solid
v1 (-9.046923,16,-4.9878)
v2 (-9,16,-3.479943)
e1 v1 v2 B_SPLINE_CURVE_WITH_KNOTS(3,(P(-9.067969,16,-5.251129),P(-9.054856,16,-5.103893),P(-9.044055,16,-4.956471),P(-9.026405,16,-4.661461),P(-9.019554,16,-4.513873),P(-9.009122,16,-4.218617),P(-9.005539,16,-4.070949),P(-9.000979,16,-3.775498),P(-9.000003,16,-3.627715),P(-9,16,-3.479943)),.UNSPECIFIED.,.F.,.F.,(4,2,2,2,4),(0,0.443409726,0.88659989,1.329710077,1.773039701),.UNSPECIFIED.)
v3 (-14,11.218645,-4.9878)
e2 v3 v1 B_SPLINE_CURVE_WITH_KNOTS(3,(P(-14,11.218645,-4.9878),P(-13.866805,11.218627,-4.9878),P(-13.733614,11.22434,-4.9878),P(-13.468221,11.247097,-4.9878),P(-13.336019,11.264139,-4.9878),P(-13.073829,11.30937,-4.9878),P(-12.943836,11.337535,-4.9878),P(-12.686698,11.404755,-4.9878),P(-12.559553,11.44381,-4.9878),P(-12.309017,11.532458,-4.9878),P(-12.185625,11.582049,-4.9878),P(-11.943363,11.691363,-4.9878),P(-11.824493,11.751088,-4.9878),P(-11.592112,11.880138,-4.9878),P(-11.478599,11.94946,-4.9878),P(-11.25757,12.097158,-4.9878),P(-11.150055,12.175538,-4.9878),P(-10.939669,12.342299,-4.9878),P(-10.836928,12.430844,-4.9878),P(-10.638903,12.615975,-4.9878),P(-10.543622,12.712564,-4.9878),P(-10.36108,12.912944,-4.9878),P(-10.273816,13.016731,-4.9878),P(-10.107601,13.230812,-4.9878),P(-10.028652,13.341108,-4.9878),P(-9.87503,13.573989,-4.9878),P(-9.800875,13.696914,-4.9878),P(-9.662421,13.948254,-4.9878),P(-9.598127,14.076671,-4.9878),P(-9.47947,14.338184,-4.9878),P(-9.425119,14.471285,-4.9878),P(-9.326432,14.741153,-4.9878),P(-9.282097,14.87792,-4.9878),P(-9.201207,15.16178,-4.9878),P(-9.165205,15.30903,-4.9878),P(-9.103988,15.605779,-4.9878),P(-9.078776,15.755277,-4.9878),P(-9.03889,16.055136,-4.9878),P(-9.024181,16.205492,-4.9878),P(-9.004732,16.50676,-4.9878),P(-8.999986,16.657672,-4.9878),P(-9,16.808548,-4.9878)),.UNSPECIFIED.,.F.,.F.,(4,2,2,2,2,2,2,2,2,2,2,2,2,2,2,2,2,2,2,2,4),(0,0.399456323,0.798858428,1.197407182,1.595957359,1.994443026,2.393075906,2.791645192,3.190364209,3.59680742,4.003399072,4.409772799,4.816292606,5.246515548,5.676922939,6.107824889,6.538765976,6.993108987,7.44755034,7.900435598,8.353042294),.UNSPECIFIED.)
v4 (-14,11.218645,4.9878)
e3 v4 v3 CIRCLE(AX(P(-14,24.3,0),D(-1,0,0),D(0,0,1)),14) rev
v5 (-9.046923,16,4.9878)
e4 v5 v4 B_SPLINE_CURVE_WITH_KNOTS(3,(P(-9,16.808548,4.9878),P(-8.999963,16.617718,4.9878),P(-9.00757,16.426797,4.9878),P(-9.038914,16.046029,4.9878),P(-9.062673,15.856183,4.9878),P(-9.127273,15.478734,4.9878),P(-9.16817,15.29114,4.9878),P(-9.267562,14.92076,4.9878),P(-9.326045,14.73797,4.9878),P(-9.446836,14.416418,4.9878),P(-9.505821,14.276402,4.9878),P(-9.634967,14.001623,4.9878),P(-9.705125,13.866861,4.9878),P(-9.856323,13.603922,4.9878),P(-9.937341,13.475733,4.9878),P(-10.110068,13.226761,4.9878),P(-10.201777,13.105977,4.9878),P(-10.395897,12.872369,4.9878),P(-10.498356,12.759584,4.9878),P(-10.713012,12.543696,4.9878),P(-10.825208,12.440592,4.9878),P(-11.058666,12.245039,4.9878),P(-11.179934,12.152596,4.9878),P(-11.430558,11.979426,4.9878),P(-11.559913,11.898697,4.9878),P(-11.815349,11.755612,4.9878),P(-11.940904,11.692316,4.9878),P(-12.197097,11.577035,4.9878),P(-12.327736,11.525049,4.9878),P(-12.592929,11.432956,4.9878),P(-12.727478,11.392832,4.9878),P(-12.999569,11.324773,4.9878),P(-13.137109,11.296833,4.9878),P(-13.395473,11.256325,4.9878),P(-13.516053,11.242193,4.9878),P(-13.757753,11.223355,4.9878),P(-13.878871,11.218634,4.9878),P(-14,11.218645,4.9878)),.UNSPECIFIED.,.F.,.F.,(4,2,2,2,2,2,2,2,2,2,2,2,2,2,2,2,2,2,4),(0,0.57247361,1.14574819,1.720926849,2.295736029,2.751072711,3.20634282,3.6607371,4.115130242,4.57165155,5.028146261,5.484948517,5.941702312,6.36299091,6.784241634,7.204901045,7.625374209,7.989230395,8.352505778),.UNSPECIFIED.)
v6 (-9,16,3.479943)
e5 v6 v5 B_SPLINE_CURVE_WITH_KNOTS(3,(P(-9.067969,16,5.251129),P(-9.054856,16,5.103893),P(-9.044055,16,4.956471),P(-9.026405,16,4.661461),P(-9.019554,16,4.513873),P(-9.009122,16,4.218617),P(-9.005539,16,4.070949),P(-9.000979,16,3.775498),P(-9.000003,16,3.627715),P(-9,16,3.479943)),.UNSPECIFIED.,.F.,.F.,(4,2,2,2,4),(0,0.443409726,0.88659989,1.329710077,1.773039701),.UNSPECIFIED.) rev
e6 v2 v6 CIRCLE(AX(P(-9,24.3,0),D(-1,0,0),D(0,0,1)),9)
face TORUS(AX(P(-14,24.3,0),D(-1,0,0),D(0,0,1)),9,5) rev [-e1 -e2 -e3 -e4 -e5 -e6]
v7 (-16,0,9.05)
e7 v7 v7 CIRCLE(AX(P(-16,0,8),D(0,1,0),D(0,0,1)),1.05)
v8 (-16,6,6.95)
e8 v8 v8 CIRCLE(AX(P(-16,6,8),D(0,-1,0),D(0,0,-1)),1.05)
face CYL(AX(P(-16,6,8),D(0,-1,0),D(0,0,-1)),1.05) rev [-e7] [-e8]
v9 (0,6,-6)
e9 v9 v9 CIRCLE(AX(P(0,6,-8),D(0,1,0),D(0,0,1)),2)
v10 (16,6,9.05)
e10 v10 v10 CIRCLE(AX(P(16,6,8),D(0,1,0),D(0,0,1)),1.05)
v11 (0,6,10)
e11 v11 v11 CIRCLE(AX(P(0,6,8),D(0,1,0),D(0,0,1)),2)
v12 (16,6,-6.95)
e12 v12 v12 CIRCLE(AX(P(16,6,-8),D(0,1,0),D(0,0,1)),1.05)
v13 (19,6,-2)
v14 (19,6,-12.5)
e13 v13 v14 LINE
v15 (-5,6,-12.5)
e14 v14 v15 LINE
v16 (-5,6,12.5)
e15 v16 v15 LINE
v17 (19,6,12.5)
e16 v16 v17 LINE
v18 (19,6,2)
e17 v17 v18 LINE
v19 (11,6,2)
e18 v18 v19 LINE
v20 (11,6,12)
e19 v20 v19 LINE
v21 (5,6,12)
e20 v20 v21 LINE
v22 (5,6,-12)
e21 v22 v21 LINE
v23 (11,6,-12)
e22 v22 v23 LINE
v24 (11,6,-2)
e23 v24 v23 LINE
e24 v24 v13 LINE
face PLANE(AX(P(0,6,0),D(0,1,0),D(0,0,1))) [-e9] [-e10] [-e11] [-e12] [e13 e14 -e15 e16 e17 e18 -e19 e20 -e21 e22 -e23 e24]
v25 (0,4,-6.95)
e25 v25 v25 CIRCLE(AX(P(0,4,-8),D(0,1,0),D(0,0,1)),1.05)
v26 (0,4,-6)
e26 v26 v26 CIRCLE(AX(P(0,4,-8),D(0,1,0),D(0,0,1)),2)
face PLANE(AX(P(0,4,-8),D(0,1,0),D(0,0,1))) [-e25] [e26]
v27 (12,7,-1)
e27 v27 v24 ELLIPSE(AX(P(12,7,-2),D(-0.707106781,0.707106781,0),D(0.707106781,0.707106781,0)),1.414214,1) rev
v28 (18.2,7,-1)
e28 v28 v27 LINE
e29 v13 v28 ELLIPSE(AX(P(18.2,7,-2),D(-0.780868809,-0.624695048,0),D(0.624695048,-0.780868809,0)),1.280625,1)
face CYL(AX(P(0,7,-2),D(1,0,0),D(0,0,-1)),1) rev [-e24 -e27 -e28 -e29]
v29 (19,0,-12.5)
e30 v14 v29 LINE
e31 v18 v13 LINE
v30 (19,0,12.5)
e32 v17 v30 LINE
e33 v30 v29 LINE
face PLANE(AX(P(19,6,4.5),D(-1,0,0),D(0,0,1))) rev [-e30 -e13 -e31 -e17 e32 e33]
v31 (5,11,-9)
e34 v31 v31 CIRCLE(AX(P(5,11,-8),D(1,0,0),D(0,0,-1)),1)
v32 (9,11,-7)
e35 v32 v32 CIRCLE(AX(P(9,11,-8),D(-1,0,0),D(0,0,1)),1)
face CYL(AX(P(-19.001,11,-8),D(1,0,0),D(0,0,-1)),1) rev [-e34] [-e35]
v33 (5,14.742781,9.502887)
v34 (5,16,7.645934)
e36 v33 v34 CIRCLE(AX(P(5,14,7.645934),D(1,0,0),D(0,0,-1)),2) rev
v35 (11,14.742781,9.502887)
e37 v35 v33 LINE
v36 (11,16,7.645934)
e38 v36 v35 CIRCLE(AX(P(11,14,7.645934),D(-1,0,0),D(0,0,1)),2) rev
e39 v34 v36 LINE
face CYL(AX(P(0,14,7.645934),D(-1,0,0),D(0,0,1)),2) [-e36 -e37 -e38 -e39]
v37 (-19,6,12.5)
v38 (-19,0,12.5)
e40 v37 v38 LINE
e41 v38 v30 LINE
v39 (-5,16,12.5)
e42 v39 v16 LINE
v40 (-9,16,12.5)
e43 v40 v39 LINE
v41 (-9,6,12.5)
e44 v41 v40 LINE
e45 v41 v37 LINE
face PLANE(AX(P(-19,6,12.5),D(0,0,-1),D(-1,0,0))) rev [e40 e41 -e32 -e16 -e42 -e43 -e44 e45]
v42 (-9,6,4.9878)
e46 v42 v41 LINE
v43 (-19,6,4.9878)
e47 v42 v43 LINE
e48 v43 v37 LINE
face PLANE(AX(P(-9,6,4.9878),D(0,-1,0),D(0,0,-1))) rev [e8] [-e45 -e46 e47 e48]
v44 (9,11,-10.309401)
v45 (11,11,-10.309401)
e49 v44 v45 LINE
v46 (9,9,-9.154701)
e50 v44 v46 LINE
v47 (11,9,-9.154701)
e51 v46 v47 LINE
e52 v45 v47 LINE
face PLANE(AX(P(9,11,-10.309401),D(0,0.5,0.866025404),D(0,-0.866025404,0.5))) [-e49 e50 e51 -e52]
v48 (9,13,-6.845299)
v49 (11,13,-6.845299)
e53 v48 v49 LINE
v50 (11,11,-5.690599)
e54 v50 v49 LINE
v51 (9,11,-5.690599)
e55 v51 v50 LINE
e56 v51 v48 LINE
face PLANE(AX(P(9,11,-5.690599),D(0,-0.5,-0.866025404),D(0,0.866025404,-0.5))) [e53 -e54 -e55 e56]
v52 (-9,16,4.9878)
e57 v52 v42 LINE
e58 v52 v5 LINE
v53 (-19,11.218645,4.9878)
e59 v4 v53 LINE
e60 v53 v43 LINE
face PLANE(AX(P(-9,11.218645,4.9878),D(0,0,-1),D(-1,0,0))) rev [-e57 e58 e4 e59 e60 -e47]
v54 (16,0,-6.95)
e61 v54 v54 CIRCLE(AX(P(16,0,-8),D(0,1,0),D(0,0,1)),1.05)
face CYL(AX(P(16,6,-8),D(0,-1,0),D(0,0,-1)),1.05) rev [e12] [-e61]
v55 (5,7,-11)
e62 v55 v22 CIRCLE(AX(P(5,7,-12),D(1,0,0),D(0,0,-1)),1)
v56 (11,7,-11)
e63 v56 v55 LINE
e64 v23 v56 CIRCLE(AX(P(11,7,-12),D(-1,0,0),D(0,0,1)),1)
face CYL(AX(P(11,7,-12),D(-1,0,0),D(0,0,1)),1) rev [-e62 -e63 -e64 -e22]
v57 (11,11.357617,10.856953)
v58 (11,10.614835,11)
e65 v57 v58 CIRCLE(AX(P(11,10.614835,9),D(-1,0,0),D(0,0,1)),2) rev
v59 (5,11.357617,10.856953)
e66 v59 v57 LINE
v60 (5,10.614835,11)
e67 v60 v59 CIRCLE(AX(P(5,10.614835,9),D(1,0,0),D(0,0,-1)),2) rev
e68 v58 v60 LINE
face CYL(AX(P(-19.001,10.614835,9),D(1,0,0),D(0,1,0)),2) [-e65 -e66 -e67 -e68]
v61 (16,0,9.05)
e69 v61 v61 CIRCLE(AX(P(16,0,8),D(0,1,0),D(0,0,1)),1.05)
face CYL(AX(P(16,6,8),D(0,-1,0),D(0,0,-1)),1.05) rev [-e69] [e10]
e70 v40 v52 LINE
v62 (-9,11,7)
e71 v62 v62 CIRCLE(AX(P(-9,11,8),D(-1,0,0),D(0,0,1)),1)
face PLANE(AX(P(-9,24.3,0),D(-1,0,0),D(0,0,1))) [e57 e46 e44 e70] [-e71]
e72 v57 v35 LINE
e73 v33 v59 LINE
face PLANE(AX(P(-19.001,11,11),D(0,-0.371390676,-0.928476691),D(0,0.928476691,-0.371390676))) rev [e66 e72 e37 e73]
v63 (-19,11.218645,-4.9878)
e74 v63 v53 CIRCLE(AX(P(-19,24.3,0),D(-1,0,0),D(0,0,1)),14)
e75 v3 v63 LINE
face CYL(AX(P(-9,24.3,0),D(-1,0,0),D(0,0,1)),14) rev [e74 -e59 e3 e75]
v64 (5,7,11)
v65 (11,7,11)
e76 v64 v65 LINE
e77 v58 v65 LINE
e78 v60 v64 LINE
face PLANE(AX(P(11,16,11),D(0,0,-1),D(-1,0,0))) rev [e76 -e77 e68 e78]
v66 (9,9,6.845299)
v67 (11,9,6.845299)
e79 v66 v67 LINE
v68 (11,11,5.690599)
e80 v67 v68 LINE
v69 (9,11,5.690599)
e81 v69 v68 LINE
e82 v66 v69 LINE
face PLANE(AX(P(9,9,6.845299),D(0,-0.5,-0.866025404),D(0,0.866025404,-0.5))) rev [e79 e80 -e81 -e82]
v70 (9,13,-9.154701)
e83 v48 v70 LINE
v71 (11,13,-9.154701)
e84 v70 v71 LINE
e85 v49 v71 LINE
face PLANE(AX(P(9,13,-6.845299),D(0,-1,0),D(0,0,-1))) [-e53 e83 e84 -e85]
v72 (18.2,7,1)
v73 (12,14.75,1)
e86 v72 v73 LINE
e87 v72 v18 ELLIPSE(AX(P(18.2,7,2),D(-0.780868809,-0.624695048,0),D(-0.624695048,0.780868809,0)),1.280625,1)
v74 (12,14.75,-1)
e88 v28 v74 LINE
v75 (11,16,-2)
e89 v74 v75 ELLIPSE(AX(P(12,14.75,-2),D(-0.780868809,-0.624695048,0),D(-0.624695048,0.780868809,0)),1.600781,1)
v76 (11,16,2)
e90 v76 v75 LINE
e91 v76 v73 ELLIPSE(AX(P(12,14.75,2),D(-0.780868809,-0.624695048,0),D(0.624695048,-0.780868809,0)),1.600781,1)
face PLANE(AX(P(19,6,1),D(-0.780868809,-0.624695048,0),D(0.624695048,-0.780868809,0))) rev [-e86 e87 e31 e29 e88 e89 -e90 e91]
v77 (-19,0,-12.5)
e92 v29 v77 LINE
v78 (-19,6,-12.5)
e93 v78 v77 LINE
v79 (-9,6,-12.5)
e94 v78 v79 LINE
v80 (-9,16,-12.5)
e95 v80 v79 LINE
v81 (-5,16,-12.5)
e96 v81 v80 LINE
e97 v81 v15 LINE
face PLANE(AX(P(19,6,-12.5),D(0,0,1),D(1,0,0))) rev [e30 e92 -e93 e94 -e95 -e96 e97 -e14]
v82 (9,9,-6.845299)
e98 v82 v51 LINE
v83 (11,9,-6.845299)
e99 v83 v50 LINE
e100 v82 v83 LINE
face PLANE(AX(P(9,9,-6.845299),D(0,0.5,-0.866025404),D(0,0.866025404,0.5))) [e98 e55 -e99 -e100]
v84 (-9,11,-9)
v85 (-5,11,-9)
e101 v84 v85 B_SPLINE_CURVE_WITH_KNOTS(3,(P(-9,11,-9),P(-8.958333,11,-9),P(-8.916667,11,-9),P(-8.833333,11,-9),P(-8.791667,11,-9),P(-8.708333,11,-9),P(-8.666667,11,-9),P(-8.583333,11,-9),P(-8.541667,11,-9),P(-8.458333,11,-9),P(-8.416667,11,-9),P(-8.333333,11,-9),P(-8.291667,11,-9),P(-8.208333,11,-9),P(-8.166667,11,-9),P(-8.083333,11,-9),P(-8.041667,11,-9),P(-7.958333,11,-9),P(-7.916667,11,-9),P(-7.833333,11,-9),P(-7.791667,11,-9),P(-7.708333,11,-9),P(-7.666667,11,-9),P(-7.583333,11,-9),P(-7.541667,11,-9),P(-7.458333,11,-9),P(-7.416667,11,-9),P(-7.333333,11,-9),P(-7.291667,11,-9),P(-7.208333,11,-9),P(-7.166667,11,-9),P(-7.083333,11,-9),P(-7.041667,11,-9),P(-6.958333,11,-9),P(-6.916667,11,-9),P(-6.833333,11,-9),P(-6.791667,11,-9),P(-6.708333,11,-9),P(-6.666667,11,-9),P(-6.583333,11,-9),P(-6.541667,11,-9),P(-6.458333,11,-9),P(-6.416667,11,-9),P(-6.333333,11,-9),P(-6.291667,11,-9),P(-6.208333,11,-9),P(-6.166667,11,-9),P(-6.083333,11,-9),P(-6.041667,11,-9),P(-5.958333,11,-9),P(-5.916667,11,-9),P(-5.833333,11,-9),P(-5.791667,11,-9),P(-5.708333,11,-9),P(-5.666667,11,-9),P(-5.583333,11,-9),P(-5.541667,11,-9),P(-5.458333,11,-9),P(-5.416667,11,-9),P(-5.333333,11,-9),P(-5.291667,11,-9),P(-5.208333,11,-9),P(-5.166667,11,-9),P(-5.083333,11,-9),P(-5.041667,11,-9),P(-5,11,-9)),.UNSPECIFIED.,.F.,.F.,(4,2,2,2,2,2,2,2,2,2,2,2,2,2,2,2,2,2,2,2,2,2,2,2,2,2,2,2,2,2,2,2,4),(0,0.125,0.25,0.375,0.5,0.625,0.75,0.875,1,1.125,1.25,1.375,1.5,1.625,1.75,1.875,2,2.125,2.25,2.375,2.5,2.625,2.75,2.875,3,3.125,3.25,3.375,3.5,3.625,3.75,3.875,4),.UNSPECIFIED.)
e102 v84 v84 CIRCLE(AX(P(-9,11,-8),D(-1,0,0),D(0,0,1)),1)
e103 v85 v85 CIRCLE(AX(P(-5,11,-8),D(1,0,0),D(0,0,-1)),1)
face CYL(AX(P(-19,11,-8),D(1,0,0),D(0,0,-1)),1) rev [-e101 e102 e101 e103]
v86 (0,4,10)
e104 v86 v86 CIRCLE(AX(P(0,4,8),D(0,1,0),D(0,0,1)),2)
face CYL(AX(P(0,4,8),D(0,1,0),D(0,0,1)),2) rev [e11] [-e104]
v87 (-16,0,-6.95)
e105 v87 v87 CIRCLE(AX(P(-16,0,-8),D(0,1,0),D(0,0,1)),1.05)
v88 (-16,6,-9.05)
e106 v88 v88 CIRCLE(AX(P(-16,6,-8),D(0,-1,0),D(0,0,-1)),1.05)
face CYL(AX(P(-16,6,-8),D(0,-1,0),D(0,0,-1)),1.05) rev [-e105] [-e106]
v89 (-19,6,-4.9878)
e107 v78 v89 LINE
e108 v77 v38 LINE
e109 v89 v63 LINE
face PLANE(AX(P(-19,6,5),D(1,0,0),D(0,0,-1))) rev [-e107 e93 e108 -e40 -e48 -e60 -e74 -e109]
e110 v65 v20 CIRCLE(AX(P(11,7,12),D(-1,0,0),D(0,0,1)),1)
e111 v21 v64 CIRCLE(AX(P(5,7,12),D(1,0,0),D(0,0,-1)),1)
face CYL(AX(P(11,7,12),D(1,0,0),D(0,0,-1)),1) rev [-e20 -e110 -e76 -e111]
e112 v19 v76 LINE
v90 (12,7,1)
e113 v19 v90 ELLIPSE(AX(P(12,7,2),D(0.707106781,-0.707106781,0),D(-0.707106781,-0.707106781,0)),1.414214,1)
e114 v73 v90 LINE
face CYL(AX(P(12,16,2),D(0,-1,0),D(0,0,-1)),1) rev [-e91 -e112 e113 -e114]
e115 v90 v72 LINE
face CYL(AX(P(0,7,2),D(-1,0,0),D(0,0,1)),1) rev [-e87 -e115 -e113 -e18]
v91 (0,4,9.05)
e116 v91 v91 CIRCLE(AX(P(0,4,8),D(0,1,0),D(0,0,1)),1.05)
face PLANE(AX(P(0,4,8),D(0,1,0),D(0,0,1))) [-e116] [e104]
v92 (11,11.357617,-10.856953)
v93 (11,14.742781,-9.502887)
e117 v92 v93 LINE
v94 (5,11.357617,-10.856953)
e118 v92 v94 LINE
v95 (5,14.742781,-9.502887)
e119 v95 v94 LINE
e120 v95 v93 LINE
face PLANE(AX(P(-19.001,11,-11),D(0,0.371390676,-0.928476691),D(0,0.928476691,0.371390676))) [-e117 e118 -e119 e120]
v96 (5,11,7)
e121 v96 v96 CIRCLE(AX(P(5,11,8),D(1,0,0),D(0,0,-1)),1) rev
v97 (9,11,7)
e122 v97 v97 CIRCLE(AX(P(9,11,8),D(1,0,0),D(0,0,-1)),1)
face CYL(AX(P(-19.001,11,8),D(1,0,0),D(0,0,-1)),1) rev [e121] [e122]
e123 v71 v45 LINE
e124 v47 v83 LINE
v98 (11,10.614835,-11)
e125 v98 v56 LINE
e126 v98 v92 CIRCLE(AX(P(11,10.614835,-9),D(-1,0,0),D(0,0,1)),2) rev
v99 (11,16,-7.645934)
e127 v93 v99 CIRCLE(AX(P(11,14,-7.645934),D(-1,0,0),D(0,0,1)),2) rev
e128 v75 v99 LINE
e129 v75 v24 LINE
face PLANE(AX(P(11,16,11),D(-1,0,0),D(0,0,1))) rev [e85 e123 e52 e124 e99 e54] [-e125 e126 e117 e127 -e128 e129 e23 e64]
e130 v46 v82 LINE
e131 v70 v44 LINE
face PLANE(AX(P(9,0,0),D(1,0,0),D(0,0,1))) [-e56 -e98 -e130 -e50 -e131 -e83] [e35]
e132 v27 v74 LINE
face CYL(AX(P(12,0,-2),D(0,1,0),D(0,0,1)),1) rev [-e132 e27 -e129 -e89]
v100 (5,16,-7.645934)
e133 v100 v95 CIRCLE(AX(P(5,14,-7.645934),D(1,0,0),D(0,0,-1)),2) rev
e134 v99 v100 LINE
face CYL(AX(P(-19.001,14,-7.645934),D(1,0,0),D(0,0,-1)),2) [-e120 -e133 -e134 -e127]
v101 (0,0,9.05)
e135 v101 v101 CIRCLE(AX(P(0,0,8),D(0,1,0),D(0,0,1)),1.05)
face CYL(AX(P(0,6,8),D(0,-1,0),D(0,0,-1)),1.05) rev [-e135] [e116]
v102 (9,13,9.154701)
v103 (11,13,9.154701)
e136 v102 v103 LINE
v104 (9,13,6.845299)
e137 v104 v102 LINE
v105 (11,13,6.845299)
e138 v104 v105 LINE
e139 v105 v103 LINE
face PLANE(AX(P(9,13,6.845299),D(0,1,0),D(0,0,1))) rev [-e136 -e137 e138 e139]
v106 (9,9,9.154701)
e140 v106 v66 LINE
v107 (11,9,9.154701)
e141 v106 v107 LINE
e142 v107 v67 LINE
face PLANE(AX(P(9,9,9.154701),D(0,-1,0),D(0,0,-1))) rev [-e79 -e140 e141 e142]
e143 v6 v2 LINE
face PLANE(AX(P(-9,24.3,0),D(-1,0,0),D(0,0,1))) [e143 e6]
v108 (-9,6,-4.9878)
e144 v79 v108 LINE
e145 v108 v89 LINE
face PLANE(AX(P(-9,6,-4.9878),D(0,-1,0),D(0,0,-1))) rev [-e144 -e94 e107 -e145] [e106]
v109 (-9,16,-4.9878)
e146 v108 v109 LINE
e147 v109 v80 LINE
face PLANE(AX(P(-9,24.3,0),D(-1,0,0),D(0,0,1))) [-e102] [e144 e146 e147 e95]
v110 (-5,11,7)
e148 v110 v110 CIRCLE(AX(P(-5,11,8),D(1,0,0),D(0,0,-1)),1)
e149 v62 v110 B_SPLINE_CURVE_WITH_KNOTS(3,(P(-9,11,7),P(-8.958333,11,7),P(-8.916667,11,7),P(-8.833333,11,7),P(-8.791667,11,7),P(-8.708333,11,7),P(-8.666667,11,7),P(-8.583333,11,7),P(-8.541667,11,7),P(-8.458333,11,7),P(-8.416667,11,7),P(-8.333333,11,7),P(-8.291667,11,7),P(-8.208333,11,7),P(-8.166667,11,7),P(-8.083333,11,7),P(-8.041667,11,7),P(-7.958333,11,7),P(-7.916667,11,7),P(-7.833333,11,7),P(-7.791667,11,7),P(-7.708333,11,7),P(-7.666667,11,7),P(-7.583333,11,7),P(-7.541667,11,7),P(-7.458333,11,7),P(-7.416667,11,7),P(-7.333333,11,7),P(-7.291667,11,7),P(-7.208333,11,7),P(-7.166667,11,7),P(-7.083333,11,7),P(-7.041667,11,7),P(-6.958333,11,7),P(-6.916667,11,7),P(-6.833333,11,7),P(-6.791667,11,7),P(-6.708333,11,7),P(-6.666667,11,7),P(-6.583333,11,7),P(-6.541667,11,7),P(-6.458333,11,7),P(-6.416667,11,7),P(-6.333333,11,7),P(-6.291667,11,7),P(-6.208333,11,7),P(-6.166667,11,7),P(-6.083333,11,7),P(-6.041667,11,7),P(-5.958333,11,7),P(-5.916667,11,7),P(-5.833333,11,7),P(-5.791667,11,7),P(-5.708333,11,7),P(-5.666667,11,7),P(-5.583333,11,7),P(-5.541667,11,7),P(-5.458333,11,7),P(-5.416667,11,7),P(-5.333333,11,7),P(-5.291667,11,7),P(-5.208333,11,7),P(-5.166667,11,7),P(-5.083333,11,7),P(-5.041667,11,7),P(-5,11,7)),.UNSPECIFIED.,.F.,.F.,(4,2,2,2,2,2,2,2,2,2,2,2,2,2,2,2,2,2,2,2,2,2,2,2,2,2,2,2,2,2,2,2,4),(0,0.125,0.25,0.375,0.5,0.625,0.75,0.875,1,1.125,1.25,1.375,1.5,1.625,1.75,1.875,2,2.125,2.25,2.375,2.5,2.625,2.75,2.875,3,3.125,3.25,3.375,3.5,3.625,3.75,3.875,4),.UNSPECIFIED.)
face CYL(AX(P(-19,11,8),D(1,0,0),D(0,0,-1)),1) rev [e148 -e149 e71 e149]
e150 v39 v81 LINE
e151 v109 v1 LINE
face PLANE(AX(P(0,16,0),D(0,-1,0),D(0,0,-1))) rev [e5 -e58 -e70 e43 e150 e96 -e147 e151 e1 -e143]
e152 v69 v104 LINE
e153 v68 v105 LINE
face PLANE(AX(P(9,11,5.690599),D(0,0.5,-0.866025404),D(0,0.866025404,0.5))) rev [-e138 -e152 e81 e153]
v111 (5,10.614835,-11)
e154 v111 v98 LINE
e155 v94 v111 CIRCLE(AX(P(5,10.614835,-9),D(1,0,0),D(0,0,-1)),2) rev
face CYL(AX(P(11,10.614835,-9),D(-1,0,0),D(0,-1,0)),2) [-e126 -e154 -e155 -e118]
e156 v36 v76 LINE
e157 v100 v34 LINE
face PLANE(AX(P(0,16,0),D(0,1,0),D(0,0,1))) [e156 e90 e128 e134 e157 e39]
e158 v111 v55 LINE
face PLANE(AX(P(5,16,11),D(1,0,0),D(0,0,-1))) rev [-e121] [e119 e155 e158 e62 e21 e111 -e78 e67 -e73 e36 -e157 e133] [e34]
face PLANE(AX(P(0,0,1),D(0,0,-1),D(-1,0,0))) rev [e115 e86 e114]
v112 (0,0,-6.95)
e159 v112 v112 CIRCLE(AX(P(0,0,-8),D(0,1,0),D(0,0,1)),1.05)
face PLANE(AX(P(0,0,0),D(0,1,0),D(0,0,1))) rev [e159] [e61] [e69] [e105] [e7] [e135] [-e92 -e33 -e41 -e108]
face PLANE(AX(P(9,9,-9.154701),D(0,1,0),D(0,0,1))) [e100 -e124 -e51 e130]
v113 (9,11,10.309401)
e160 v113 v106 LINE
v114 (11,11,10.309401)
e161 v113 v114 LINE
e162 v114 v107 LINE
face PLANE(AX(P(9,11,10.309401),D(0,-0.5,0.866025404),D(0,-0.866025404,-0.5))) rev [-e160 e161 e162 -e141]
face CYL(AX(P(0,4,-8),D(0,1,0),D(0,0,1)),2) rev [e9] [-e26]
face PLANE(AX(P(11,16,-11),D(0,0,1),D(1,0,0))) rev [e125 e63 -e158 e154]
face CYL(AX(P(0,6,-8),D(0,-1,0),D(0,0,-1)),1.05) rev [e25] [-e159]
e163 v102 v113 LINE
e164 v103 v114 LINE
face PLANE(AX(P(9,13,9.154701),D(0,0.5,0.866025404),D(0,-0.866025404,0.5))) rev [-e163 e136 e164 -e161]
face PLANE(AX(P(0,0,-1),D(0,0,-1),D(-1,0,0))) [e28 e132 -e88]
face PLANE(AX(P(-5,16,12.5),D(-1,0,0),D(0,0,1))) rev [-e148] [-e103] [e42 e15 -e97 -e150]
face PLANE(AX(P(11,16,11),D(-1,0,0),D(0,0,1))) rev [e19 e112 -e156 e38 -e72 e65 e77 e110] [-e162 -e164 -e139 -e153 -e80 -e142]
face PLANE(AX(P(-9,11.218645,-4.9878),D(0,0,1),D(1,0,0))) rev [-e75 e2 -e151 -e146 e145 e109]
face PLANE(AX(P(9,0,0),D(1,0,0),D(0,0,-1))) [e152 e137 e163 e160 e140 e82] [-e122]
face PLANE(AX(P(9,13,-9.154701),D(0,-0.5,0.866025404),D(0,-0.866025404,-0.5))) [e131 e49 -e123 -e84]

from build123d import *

# Parameters (mm, degrees)
SKETCH1_R           = 1.05
BOSS_EXTRUDE1_DEPTH = 6
SKETCH2_W           = 14
SKETCH2_H           = 25
SKETCH2_W_2         = 6
SKETCH2_H_2         = 22
BOSS_EXTRUDE2_DEPTH = 10
FILLET1_R           = 1
CUT_EXTRUDE2_START  = -6
CUT_EXTRUDE2_DEPTH  = 6
FILLET2_R           = 2
CUT_EXTRUDE3_DEPTH  = 2
CUT_EXTRUDE4_REACH  = 36.587
SKETCH9_R           = 1
BOSS_EXTRUDE3_DEPTH = 1
FILLET3_R           = 1
SKETCH13_R          = 2
CUT_EXTRUDE5_DEPTH  = 2
CUT_EXTRUDE6_DEPTH  = 10
SKETCH15_R          = 1
CUT_EXTRUDE7_DEPTH  = 32.436443819
FILLET4_R           = 5


with BuildPart() as part:
    # Sketch1 → Boss-Extrude1 (new body)
    with BuildSketch(Plane(origin=(0, 0, 0), x_dir=(1, 0, 0), z_dir=(0, 1, 0))):
        Polygon((19, -4.5), (19, 5), (19, 12.5), (-19, 12.5), (-19, 5), (-19, -4.5), (-19, -5), (-19, -12.5), (19, -12.5), (19, -5), align=None)
        with Locations(Location((16, -8, 0), (0, 0, 270))):
            Circle(SKETCH1_R, mode=Mode.SUBTRACT)
        with Locations(Location((0, -8, 0), (0, 0, 270))):
            Circle(SKETCH1_R, mode=Mode.SUBTRACT)
        with Locations(Location((16, 8, 0), (0, 0, 270))):
            Circle(SKETCH1_R, mode=Mode.SUBTRACT)
        with Locations(Location((0, 8, 0), (0, 0, 270))):
            Circle(SKETCH1_R, mode=Mode.SUBTRACT)
        with Locations(Location((-16, -8, 0), (0, 0, 270))):
            Circle(SKETCH1_R, mode=Mode.SUBTRACT)
        with Locations(Location((-16, 8, 0), (0, 0, 270))):
            Circle(SKETCH1_R, mode=Mode.SUBTRACT)
    extrude(amount=BOSS_EXTRUDE1_DEPTH)

    # Sketch2 → Boss-Extrude2 (add)
    with BuildSketch(Plane(origin=(0, 6, 0), x_dir=(1, 0, 0), z_dir=(0, 1, 0))):
        with Locations((-12, 0)):
            Rectangle(SKETCH2_W, SKETCH2_H)
        with Locations((8, 0)):
            Rectangle(SKETCH2_W_2, SKETCH2_H_2)
    extrude(amount=BOSS_EXTRUDE2_DEPTH)

    # Fillet1
    fillet1_edges = [part.edges().sort_by_distance(p)[0] for p in [
        (8, 6, -11),
        (8, 6, 11),
    ]]
    fillet(fillet1_edges, radius=FILLET1_R)

    # Sketch7 → Cut-Extrude2 (cut)
    with BuildSketch(Plane(origin=(11, 0, 0), x_dir=(0, 0, -1), z_dir=(1, 0, 0)).offset(CUT_EXTRUDE2_START)):
        Polygon((-11, 11), (-9, 16), (9, 16), (11, 11), (15.487403983, 11), (15.487403983, 19.998448993), (-12.222391387, 19.998448993), (-12.222391387, 11), align=None)
    extrude(amount=CUT_EXTRUDE2_DEPTH, mode=Mode.SUBTRACT)

    # Fillet2
    fillet2_edges = [part.edges().sort_by_distance(p)[0] for p in [
        (8, 11, 11),
        (8, 16, 9),
        (8, 16, -9),
        (8, 11, -11),
    ]]
    fillet(fillet2_edges, radius=FILLET2_R)

    # Sketch8 → Cut-Extrude3 (cut)
    with BuildSketch(Plane(origin=(11, 0, 0), x_dir=(0, 0, -1), z_dir=(1, 0, 0))):
        Polygon((-5.690598923, 11), (-6.845299462, 13), (-9.154700538, 13), (-10.309401077, 11), (-9.154700538, 9), (-6.845299462, 9), align=None)
    cut_extrude3 = extrude(amount=-CUT_EXTRUDE3_DEPTH, mode=Mode.SUBTRACT)

    # Sketch9 → Cut-Extrude4 (cut, up to next)
    with BuildSketch(Plane(origin=(9, 0, 0), x_dir=(0, 0, -1), z_dir=(1, 0, 0)), mode=Mode.PRIVATE) as cut_extrude4_sk1:
        with Locations((-8, 11)):
            Circle(SKETCH9_R)
    cut_extrude4_tool1 = extrude(cut_extrude4_sk1.sketch, amount=-CUT_EXTRUDE4_REACH, mode=Mode.PRIVATE) & part.part
    cut_extrude4 = cut_extrude4_tool1.solids().sort_by_distance((9, 11, 8))[0]
    add(cut_extrude4, mode=Mode.SUBTRACT)

    # Mirror1: Cut-Extrude3, Cut-Extrude4 across plane
    add(cut_extrude3.mirror(Plane.XY), mode=Mode.SUBTRACT)
    add(cut_extrude4.mirror(Plane.XY), mode=Mode.SUBTRACT)

    # Sketch11 → Boss-Extrude3 (add, symmetric)
    with BuildSketch(Plane.XY):
        Polygon((19, 6), (11, 16), (11, 6), align=None)
    extrude(amount=BOSS_EXTRUDE3_DEPTH, both=True)

    # Fillet3
    # the kernel refuses this fillet: 1 mm, written as the material it adds along each edge
    with BuildSketch(Plane(origin=(8.5, 6, 1), x_dir=(0, 1, 0), z_dir=(1, 0, 0))) as fillet3_piece_1_section:
        with BuildLine():
            CenterArc((FILLET3_R, FILLET3_R), FILLET3_R, 180, 90)
            Line((0, FILLET3_R), (0, 0))
            Line((0, 0), (FILLET3_R, 0))
        make_face()
    fillet3_piece_1 = extrude(amount=10.5, mode=Mode.PRIVATE)
    fillet3_piece_1 = split(fillet3_piece_1, bisect_by=Plane(origin=(15.279807261, 10.650240923, 1.226395114), z_dir=(-0.7808688094430304, -0.6246950475544243, 0)), keep=Keep.TOP, mode=Mode.PRIVATE)
    add(fillet3_piece_1)
    with BuildSketch(Plane(origin=(11, 16, 1), x_dir=(0, 0, 1), z_dir=(0, -1, 0))) as fillet3_piece_2_section:
        with BuildLine():
            CenterArc((FILLET3_R, -FILLET3_R), FILLET3_R, 90, 90)
            Line((0, -FILLET3_R), (0, 0))
            Line((0, 0), (FILLET3_R, 0))
        make_face()
    fillet3_piece_2 = extrude(amount=12.5, mode=Mode.PRIVATE)
    fillet3_piece_2 = split(fillet3_piece_2, bisect_by=Plane(origin=(13.592508379, 12.759364526, 1.22990039), z_dir=(-0.7808688094430304, -0.6246950475544243, 0)), keep=Keep.TOP, mode=Mode.PRIVATE)
    add(fillet3_piece_2)
    with BuildSketch(Plane(origin=(8.5, 6, -1), x_dir=(0, 0, -1), z_dir=(1, 0, 0))) as fillet3_piece_3_section:
        with BuildLine():
            CenterArc((FILLET3_R, FILLET3_R), FILLET3_R, 180, 90)
            Line((0, FILLET3_R), (0, 0))
            Line((0, 0), (FILLET3_R, 0))
        make_face()
    fillet3_piece_3 = extrude(amount=10.5, mode=Mode.PRIVATE)
    fillet3_piece_3 = split(fillet3_piece_3, bisect_by=Plane(origin=(15.279807261, 10.650240923, -1.226395114), z_dir=(-0.7808688094430304, -0.6246950475544243, 0)), keep=Keep.TOP, mode=Mode.PRIVATE)
    add(fillet3_piece_3)
    with BuildSketch(Plane(origin=(11, 16, -1), x_dir=(0, 0, -1), z_dir=(0, -1, 0))) as fillet3_piece_4_section:
        with BuildLine():
            CenterArc((FILLET3_R, FILLET3_R), FILLET3_R, 180, 90)
            Line((0, FILLET3_R), (0, 0))
            Line((0, 0), (FILLET3_R, 0))
        make_face()
    fillet3_piece_4 = extrude(amount=12.5, mode=Mode.PRIVATE)
    fillet3_piece_4 = split(fillet3_piece_4, bisect_by=Plane(origin=(13.592508379, 12.759364526, -1.22990039), z_dir=(-0.7808688094430304, -0.6246950475544243, 0)), keep=Keep.TOP, mode=Mode.PRIVATE)
    add(fillet3_piece_4)

    # Sketch13 → Cut-Extrude5 (cut)
    with BuildSketch(Plane(origin=(0, 6, 0), x_dir=(1, 0, 0), z_dir=(0, 1, 0))):
        with Locations(Location((0, -8, 0), (0, 0, 270))):
            Circle(SKETCH13_R)
        with Locations(Location((0, 8, 0), (0, 0, 270))):
            Circle(SKETCH13_R)
    extrude(amount=-CUT_EXTRUDE5_DEPTH, mode=Mode.SUBTRACT)

    # Sketch14 → Cut-Extrude6 (cut)
    with BuildSketch(Plane.ZY.offset(19)):
        with BuildLine():
            Line((-4.987800212, 11.218644984), (-4.987800212, 6))
            Line((-4.987800212, 6), (-16.528108282, 6))
            Line((-16.528108282, 6), (-16.528108282, 44.040536724))
            Line((-16.528108282, 44.040536724), (16.528108282, 44.040536724))
            Line((16.528108282, 44.040536724), (16.528108282, 6))
            Line((16.528108282, 6), (4.987800212, 6))
            Line((4.987800212, 6), (4.987800212, 11.218644984))
            ThreePointArc((4.987800212, 11.218644984), (0, 10.3), (-4.987800212, 11.218644984))
        make_face()
    extrude(amount=-CUT_EXTRUDE6_DEPTH, mode=Mode.SUBTRACT)

    # Sketch15 → Cut-Extrude7 (cut, through all)
    with BuildSketch(Plane(origin=(-5, 0, 0), x_dir=(0, 0, -1), z_dir=(1, 0, 0))):
        with Locations((-8, 11)):
            Circle(SKETCH15_R)
        with Locations((8, 11)):
            Circle(SKETCH15_R)
    extrude(amount=-CUT_EXTRUDE7_DEPTH, mode=Mode.SUBTRACT)

    # Fillet4
    # the kernel refuses this fillet: 5 mm, written as the material it adds along each edge
    with BuildSketch(Plane(origin=(-9, 24.3, 0), x_dir=(0, -0.30847325638563394, 0.9512330156669516), z_dir=(0, 0.9512330156669516, 0.30847325638563394))) as fillet4_piece_1_section:
        with BuildLine():
            CenterArc((14 - FILLET4_R, -FILLET4_R), FILLET4_R, 0, 90)
            Line((14, -FILLET4_R), (14, 0))
            Line((14, 0), (14 - FILLET4_R, 0))
        make_face()
    fillet4_piece_1 = revolve(axis=Axis((-9, 24.3, 0), (1, 0, 0)), revolution_arc=144.065508201, mode=Mode.PRIVATE)
    fillet4_piece_1 = split(fillet4_piece_1, bisect_by=Plane(origin=(-10.130683899, 16, -3.44e-07), z_dir=(0, -1, 0)), keep=Keep.TOP, mode=Mode.PRIVATE)
    fillet4_piece_1 = split(fillet4_piece_1, bisect_by=Plane(origin=(-10.130683899, 11.770838436, 4.987800212), z_dir=(0, 0, -1)), keep=Keep.TOP, mode=Mode.PRIVATE)
    fillet4_piece_1 = split(fillet4_piece_1, bisect_by=Plane(origin=(-10.130683899, 11.770838436, -4.987800212), z_dir=(0, 0, 1)), keep=Keep.TOP, mode=Mode.PRIVATE)
    add(fillet4_piece_1)


solid = part.part
